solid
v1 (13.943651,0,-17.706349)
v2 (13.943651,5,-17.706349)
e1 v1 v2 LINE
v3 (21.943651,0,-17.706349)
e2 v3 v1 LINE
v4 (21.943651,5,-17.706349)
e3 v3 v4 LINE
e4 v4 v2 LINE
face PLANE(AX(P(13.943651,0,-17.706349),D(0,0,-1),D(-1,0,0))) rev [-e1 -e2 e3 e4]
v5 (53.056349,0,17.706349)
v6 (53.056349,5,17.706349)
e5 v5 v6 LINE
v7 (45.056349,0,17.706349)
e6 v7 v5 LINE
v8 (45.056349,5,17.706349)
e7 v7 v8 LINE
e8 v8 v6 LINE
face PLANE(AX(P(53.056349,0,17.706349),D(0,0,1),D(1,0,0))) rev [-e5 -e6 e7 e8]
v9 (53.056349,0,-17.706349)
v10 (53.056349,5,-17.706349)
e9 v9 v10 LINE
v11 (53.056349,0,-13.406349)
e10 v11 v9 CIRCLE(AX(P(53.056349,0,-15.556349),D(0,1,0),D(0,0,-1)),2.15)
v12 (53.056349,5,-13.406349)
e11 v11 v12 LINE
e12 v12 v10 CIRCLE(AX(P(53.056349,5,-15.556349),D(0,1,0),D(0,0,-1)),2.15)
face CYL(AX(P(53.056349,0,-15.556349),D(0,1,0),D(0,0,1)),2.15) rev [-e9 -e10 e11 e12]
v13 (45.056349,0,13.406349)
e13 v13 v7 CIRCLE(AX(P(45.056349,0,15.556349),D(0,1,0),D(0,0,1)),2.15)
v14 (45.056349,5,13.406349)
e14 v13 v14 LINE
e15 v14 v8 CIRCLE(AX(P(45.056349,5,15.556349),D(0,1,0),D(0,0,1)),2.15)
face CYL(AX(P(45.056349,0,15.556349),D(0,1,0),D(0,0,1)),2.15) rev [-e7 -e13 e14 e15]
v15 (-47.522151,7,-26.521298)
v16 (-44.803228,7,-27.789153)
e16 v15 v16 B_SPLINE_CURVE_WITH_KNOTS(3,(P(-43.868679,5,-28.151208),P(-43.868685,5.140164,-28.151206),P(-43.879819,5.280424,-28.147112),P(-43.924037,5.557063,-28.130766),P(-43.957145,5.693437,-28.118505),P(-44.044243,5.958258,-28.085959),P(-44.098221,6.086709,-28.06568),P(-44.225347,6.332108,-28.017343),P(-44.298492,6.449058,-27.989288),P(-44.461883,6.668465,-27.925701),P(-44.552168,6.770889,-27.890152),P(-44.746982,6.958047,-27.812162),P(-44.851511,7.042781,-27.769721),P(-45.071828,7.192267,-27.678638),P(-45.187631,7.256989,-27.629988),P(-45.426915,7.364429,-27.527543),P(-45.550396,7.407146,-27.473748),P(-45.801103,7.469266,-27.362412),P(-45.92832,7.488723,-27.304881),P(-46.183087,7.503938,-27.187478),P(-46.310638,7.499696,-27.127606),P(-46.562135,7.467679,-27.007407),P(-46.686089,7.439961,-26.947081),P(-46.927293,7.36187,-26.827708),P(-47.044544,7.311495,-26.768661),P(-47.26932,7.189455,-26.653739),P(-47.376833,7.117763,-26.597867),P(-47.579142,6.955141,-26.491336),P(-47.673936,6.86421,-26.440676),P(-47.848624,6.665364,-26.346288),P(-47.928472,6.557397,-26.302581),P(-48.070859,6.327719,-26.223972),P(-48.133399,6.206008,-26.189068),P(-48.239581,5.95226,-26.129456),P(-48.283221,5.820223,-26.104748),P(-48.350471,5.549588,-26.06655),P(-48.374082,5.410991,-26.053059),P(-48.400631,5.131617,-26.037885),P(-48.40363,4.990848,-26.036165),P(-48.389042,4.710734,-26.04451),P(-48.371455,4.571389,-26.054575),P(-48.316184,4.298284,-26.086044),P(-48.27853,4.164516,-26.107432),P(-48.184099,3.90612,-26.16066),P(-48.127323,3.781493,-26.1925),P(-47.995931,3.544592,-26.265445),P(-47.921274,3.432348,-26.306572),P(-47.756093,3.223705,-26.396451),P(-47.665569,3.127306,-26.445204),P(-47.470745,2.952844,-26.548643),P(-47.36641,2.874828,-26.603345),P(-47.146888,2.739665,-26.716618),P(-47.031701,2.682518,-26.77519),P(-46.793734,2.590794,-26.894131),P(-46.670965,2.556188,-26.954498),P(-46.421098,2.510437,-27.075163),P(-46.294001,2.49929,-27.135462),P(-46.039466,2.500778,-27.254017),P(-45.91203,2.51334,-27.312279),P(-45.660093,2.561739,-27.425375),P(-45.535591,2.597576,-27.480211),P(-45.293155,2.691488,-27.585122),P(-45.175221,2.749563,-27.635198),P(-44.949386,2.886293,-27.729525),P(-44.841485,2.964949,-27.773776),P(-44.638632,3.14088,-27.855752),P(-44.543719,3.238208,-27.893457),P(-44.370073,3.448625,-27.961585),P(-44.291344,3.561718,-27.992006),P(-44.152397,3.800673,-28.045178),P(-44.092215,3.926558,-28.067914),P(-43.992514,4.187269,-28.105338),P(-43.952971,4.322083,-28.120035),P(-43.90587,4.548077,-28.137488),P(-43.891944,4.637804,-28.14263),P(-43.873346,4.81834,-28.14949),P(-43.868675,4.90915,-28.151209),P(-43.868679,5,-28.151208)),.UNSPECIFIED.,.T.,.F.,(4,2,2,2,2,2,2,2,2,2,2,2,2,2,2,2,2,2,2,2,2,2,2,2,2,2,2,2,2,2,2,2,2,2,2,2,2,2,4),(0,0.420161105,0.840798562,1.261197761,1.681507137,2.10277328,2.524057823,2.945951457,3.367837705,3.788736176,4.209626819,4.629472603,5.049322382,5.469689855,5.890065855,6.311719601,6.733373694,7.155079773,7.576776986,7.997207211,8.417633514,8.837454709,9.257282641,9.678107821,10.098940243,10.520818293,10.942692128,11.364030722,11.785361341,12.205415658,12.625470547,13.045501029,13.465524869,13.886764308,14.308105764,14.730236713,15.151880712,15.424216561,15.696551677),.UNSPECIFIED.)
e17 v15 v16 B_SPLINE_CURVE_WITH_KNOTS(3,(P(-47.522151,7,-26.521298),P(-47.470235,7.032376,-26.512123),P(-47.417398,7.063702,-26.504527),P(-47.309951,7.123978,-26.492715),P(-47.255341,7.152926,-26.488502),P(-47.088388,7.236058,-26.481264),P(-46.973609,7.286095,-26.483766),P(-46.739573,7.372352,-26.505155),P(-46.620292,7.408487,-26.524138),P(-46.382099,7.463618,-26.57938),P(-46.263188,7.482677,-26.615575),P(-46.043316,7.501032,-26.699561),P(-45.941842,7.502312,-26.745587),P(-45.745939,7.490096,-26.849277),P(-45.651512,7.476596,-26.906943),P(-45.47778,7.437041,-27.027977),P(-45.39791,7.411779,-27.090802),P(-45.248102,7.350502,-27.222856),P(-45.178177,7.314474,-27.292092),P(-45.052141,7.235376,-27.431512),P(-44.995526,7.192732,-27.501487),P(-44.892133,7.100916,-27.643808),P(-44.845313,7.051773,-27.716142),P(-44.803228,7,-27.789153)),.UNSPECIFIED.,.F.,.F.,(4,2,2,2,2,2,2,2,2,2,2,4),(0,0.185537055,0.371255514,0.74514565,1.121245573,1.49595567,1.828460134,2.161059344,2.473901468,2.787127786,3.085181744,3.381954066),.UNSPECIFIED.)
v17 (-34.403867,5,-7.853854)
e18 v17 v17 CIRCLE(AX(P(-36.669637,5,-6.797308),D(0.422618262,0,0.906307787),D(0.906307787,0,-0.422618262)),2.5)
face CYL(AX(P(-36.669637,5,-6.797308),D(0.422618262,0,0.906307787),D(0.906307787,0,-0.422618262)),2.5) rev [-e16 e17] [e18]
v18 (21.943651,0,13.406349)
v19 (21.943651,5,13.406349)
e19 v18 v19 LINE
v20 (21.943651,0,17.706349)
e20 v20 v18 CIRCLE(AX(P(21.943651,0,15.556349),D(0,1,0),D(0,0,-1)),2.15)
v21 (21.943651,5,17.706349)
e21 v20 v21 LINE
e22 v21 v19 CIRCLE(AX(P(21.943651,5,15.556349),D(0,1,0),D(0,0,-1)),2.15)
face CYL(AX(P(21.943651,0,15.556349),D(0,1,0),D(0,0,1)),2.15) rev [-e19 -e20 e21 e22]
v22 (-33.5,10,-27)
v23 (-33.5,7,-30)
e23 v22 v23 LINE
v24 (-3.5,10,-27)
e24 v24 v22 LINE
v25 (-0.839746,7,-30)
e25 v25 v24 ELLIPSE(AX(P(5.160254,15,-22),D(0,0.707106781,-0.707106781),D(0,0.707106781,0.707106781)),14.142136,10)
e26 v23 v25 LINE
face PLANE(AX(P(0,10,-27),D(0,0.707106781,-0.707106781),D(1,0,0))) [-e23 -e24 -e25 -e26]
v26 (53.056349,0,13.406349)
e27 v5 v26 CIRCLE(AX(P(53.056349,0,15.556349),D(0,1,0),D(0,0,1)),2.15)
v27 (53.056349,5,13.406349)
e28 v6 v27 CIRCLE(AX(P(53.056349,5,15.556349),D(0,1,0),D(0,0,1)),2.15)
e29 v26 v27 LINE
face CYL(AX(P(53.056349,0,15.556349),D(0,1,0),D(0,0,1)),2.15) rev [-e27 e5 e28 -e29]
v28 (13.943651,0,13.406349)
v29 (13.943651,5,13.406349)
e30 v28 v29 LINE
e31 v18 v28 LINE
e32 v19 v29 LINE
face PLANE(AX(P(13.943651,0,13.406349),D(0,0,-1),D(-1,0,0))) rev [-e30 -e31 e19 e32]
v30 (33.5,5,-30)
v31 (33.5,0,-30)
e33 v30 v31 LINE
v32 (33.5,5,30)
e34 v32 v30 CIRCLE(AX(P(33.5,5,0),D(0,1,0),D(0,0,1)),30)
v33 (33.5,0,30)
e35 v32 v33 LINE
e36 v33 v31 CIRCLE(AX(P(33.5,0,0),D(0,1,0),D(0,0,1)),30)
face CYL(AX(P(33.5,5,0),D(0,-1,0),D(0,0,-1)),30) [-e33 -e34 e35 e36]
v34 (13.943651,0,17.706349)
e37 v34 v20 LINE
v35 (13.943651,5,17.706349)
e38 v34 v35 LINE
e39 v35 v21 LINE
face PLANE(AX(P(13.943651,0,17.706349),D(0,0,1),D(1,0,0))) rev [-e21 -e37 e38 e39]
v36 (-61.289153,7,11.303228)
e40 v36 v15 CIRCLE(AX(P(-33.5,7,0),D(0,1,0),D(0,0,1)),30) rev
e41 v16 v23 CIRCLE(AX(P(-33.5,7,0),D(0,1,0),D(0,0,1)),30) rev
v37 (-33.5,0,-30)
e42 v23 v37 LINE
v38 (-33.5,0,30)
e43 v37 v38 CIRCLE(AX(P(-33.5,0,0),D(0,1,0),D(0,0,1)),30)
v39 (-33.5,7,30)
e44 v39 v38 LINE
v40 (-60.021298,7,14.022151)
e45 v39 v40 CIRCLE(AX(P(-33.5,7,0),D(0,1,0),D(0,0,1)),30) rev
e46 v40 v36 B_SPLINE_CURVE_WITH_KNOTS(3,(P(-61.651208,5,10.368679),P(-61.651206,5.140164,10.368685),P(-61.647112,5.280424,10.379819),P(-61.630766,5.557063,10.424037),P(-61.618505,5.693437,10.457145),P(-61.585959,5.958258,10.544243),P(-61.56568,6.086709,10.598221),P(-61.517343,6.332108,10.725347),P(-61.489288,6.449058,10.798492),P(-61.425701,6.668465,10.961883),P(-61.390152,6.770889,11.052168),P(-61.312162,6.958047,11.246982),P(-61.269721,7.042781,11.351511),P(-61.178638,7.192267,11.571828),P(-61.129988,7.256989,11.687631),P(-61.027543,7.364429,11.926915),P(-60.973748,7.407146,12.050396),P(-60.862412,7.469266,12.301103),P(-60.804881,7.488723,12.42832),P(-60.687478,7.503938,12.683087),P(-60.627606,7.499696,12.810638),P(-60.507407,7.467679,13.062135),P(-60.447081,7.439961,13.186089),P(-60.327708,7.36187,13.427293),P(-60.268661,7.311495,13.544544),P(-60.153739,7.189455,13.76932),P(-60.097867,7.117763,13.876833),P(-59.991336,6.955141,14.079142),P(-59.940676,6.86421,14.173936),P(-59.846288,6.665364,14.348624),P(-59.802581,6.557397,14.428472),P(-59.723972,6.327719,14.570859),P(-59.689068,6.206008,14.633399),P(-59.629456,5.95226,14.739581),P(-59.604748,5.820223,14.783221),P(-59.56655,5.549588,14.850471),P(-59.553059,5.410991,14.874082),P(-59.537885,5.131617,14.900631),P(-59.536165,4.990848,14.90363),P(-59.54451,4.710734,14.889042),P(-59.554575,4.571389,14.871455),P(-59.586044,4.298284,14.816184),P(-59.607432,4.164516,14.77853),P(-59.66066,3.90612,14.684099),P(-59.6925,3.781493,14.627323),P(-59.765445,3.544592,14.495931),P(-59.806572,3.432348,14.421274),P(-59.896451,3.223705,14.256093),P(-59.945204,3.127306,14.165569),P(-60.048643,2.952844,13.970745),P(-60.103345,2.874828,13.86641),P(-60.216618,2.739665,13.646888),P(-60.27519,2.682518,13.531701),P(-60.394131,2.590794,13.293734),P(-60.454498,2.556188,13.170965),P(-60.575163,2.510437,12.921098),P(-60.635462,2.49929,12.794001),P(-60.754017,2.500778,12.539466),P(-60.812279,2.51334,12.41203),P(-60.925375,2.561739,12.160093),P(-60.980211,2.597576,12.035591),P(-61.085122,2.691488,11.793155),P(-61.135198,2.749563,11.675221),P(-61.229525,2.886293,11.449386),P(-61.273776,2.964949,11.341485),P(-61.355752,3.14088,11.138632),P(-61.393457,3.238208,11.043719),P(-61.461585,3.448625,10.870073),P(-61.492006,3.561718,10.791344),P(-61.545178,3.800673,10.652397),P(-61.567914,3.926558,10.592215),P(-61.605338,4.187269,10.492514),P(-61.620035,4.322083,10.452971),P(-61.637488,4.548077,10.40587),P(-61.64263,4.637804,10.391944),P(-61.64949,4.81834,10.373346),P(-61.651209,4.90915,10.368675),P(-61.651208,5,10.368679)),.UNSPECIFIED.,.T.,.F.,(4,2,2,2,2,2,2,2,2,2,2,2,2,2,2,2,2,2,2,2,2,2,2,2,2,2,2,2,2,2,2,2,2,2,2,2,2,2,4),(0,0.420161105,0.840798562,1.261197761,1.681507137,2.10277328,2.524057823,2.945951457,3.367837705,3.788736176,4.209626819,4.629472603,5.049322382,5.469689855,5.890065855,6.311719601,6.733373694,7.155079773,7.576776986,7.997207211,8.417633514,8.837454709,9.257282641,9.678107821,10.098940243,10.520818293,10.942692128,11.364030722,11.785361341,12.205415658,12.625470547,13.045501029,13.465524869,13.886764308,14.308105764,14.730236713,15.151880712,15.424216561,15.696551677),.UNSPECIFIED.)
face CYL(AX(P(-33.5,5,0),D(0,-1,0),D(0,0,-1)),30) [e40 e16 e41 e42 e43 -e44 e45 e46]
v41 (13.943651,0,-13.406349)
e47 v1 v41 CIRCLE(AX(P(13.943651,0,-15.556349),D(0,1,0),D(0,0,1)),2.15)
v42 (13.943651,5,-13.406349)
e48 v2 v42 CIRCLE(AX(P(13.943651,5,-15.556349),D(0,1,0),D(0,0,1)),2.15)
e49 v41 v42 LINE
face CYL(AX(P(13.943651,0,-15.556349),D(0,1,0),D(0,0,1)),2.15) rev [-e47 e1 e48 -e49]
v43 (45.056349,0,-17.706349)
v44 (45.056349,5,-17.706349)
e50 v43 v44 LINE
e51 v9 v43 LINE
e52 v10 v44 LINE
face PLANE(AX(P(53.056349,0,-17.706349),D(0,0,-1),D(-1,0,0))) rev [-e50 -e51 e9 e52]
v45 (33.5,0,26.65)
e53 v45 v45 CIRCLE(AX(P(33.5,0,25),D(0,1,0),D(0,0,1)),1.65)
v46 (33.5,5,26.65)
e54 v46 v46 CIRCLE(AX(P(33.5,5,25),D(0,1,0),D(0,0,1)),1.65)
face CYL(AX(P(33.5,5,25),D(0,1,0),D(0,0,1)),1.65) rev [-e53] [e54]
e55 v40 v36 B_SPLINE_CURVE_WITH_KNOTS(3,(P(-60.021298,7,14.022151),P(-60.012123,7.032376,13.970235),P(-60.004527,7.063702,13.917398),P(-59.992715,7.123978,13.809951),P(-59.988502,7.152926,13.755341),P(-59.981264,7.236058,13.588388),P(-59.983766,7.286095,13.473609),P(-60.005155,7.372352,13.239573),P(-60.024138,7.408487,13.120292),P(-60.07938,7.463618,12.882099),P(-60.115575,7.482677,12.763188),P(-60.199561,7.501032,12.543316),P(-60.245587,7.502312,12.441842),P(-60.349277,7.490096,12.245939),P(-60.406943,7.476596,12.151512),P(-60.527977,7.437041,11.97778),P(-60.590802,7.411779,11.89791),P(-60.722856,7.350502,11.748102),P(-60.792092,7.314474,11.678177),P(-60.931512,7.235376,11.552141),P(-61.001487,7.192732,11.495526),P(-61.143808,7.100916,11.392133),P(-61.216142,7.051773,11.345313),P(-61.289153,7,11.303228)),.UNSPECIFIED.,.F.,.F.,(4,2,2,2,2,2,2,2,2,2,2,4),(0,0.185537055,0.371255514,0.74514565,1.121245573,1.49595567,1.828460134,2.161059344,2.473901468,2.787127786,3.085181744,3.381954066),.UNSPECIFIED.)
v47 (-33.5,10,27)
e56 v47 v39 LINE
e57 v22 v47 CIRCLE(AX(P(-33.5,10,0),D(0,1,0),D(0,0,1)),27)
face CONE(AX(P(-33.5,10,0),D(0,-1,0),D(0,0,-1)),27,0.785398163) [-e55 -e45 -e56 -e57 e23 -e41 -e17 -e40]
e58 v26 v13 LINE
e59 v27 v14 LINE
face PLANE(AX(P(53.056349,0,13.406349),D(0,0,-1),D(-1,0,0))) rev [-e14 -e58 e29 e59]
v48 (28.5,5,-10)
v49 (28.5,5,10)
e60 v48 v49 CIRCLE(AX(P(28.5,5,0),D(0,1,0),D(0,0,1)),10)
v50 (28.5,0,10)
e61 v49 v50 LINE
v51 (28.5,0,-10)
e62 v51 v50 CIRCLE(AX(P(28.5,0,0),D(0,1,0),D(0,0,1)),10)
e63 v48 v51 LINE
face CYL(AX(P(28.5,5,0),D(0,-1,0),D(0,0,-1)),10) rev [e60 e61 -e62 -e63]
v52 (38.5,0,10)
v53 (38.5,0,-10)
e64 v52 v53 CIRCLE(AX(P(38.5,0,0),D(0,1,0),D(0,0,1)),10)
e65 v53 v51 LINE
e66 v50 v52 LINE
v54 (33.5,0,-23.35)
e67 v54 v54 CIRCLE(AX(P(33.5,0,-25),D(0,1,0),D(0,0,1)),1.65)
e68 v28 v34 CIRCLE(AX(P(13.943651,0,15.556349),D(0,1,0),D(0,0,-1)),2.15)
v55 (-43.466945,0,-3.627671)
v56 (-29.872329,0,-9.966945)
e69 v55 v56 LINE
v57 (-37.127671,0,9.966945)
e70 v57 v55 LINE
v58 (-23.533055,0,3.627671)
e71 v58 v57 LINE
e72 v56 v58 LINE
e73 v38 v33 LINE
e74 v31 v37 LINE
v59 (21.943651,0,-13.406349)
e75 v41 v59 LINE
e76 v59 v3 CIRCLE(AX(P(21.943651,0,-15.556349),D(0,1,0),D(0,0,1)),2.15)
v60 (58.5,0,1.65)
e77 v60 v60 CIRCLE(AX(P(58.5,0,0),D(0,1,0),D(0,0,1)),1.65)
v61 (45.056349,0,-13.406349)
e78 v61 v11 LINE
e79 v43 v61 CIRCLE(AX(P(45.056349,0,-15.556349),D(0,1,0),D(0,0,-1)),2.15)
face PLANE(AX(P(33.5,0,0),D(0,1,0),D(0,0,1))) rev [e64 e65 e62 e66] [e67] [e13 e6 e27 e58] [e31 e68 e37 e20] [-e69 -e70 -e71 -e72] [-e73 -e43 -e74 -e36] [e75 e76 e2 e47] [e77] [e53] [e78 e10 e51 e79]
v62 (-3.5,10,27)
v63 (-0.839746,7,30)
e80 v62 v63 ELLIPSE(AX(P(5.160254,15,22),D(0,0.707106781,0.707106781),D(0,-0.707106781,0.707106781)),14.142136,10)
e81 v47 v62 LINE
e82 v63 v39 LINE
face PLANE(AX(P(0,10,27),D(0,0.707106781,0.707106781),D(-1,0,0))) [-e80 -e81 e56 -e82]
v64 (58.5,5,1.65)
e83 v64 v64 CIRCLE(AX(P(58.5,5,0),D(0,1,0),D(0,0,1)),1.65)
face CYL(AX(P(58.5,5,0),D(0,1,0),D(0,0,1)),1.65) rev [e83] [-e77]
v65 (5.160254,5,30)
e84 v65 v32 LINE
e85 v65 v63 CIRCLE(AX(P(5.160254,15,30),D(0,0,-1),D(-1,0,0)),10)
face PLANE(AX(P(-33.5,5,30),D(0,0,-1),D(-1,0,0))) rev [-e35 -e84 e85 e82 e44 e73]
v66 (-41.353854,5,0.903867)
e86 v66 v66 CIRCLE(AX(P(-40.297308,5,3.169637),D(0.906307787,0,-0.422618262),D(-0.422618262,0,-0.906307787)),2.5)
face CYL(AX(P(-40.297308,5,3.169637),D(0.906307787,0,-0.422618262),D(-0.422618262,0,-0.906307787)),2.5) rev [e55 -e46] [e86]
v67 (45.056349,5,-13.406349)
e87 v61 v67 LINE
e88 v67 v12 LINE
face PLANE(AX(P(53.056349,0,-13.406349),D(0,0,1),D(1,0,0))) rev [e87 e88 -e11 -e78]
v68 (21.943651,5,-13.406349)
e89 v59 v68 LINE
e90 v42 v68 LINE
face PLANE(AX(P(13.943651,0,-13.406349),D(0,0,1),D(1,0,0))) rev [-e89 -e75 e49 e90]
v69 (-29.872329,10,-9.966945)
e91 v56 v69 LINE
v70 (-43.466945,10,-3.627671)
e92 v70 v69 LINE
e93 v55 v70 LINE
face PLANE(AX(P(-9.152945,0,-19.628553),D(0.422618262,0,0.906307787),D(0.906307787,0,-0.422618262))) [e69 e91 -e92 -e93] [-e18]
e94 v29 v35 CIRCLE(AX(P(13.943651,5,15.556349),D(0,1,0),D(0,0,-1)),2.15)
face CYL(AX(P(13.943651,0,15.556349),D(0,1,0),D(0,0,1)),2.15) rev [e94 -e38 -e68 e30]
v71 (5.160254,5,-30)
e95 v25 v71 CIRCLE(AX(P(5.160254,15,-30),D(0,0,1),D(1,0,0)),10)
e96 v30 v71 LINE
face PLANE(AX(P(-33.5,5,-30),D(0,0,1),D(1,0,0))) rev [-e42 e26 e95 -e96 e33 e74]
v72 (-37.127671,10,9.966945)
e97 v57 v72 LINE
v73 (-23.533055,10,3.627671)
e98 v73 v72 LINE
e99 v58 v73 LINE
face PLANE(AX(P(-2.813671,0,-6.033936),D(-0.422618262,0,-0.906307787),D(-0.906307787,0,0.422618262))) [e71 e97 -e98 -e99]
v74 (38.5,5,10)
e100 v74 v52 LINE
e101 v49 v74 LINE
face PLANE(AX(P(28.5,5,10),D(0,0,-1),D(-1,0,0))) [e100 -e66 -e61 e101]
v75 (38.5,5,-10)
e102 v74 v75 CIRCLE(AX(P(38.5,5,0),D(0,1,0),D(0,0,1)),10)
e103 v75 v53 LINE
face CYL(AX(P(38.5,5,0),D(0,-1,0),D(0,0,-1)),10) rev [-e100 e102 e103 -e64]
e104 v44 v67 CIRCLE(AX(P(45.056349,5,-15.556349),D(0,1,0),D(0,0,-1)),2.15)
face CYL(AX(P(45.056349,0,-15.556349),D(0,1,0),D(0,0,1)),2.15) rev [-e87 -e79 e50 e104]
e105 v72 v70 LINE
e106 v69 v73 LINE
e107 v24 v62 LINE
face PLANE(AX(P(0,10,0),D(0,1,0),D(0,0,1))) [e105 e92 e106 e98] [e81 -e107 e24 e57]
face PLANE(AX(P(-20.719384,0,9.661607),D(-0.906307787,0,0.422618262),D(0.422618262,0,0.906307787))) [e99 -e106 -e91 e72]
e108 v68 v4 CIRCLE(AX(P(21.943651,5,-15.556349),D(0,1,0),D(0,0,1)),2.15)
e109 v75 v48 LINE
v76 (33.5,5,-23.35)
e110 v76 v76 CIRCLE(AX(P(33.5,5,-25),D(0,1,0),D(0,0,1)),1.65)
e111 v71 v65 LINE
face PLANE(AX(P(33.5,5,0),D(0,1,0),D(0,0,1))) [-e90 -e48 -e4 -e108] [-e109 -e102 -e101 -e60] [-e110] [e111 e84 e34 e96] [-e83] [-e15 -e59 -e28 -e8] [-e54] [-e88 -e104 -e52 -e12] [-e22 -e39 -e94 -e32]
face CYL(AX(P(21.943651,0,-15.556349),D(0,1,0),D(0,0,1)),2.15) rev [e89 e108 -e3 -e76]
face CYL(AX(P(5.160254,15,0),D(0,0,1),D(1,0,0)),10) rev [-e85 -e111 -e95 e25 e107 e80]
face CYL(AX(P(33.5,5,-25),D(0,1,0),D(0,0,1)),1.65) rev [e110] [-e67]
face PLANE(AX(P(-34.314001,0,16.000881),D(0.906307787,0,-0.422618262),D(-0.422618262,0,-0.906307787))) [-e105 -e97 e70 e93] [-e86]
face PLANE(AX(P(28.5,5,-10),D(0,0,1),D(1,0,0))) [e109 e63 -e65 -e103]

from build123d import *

# Parameters (mm, degrees)
BOSS_EXTRUDE1_DEPTH = 5
CUT_EXTRUDE1_DEPTH  = 71.407741052
BOSS_EXTRUDE2_DEPTH = 5
FILLET1_R           = 10
CUT_EXTRUDE2_DEPTH  = 71.938353519
M4_TAPPED_HOLE1_D   = 3.3
SKETCH13_W          = 2.5
SKETCH13_H          = 32.367781463
SKETCH17_W          = 2.5
SKETCH17_H          = 32.367781463
CHAMFER1_SIZE       = 3


with BuildPart() as part:
    # Sketch1 → Boss-Extrude1 (new body)
    with BuildSketch(Plane(origin=(0, 0, 0), x_dir=(1, 0, 0), z_dir=(0, 1, 0))):
        with BuildLine():
            Line((-33.5, 30), (33.5, 30))
            ThreePointArc((33.5, 30), (63.5, 0), (33.5, -30))
            Line((33.5, -30), (-33.5, -30))
            ThreePointArc((-33.5, -30), (-63.5, 0), (-33.5, 30))
        make_face()
        with BuildLine():
            Line((28.5, 10), (38.5, 10))
            ThreePointArc((38.5, 10), (48.5, 0), (38.5, -10))
            Line((38.5, -10), (28.5, -10))
            ThreePointArc((28.5, -10), (18.5, 0), (28.5, 10))
        make_face(mode=Mode.SUBTRACT)
    extrude(amount=BOSS_EXTRUDE1_DEPTH)

    # Sketch2 → Cut-Extrude1 (cut, through all)
    with BuildSketch(Plane(origin=(0, 5, 0), x_dir=(1, 0, 0), z_dir=(0, 1, 0))):
        with BuildLine():
            Line((13.943650814, 17.706349186), (21.943650814, 17.706349186))
            ThreePointArc((21.943650814, 17.706349186), (24.093650814, 15.556349186), (21.943650814, 13.406349186))
            Line((21.943650814, 13.406349186), (13.943650814, 13.406349186))
            ThreePointArc((13.943650814, 13.406349186), (11.793650814, 15.556349186), (13.943650814, 17.706349186))
        make_face()
        with BuildLine():
            Line((53.056349186, 17.706349186), (45.056349186, 17.706349186))
            ThreePointArc((45.056349186, 17.706349186), (42.906349186, 15.556349186), (45.056349186, 13.406349186))
            Line((45.056349186, 13.406349186), (53.056349186, 13.406349186))
            ThreePointArc((53.056349186, 13.406349186), (55.206349186, 15.556349186), (53.056349186, 17.706349186))
        make_face()
        with BuildLine():
            Line((53.056349186, -17.706349186), (45.056349186, -17.706349186))
            ThreePointArc((45.056349186, -17.706349186), (42.906349186, -15.556349186), (45.056349186, -13.406349186))
            Line((45.056349186, -13.406349186), (53.056349186, -13.406349186))
            ThreePointArc((53.056349186, -13.406349186), (55.206349186, -15.556349186), (53.056349186, -17.706349186))
        make_face()
        with BuildLine():
            Line((13.943650814, -17.706349186), (21.943650814, -17.706349186))
            ThreePointArc((21.943650814, -17.706349186), (24.093650814, -15.556349186), (21.943650814, -13.406349186))
            Line((21.943650814, -13.406349186), (13.943650814, -13.406349186))
            ThreePointArc((13.943650814, -13.406349186), (11.793650814, -15.556349186), (13.943650814, -17.706349186))
        make_face()
    extrude(amount=-CUT_EXTRUDE1_DEPTH, mode=Mode.SUBTRACT)

    # Sketch8 → Boss-Extrude2 (add)
    with BuildSketch(Plane(origin=(0, 5, 0), x_dir=(1, 0, 0), z_dir=(0, 1, 0))):
        with BuildLine():
            ThreePointArc((-33.5, -30), (-12.286796564, -21.213203436), (-3.5, 0))
            ThreePointArc((-3.5, 0), (-12.286796564, 21.213203436), (-33.5, 30))
            ThreePointArc((-33.5, 30), (-63.5, 0), (-33.5, -30))
        make_face()
        with BuildLine():
            Line((-3.5, 0), (-3.5, 30))
            Line((-3.5, 30), (-33.5, 30))
            ThreePointArc((-33.5, 30), (-12.286796564, 21.213203436), (-3.5, 0))
        make_face()
        with BuildLine():
            Line((-3.5, -30), (-3.5, 0))
            ThreePointArc((-3.5, 0), (-12.286796564, -21.213203436), (-33.5, -30))
            Line((-33.5, -30), (-3.5, -30))
        make_face()
    extrude(amount=BOSS_EXTRUDE2_DEPTH)

    # Fillet1
    # the kernel refuses this fillet: 10 mm, written as the material it adds along each edge
    with BuildSketch(Plane(origin=(-3.5, 5, -30), x_dir=(0, 1, 0), z_dir=(0, 0, 1))) as fillet1_piece_1:
        with BuildLine():
            CenterArc((10, -8.660254038), FILLET1_R, 120, 60)
            Line((0, -8.660254038), (-0.2, -8.660254038))
            Line((-0.2, -8.660254038), (-0.2, 0))
            Line((-0.2, 0), (0, 0.2))
            ThreePointArc((0, 0.2), (2.5, 0.2), (4.9, 0.173205081))
            Line((4.9, 0.173205081), (5, 0))
        make_face()
    extrude(amount=60)

    # Sketch9 → Cut-Extrude2 (cut, through all)
    with BuildSketch(Plane(origin=(0, 10, 0), x_dir=(1, 0, 0), z_dir=(0, 1, 0))):
        Polygon((-29.87232856, 9.966945366), (-23.533054634, -3.62767144), (-37.12767144, -9.966945366), (-43.466945366, 3.62767144), align=None)
    extrude(amount=-CUT_EXTRUDE2_DEPTH, mode=Mode.SUBTRACT)

    # M4 Tapped Hole1 (through all)
    with Locations(Plane(origin=(0, 5, 0), x_dir=(1, 0, 0), z_dir=(0, 1, 0))):
        with Locations((58.5, 0), (33.5, 25), (33.5, -25)):
            Hole(M4_TAPPED_HOLE1_D / 2)

    # Sketch13 → M6 Tapped Hole1 (revolve, cut)
    with BuildSketch(Plane(origin=(-40.297308403, 5, 3.169636963), x_dir=(-0.4226182617406973, 0, -0.9063077870366509), z_dir=(0, 1, 0))):
        with Locations((1.25, 16.183890732)):
            Rectangle(SKETCH13_W, SKETCH13_H)
    revolve(axis=Axis((-34.542253955, 5, 0.486011001), (-0.9063077870366509, 0, 0.42261826174069733)), mode=Mode.SUBTRACT)

    # Sketch17 → M6 Tapped Hole3 (revolve, cut)
    with BuildSketch(Plane(origin=(-36.669636963, 5, -6.797308403), x_dir=(0.9063077870366509, 0, -0.42261826174069766), z_dir=(0, 1, 0))):
        with Locations((1.25, 16.183890732)):
            Rectangle(SKETCH17_W, SKETCH17_H)
    revolve(axis=Axis((-33.986011001, 5, -1.042253955), (-0.42261826174069766, 0, -0.9063077870366508)), mode=Mode.SUBTRACT)

    # Chamfer1
    # the kernel refuses this chamfer: 3 mm, written as the material it takes off along each edge
    with BuildSketch(Plane(origin=(-33.5, 10, 30), x_dir=(0, 0.02749587661058619, -0.9996219169112968), z_dir=(1, 0, 0)), Plane(origin=(4.215048964, 10, -30), x_dir=(0, 0.02749587661058619, 0.9996219169112968), z_dir=(-1, 0, 0))) as chamfer1_piece_1:
        Polygon((CHAMFER1_SIZE * 0.999621916911, -CHAMFER1_SIZE * 0.0274958766106), (-CHAMFER1_SIZE * 0.0274958766106, -CHAMFER1_SIZE * 0.999621916911), (0, 0), align=None)
    extrude(amount=37.715048964, mode=Mode.SUBTRACT)
    with BuildSketch(Plane(origin=(-33.5, 10, 0), x_dir=(0, 0, 1), z_dir=(1, 0, 0))) as chamfer1_piece_2:
        Polygon((30 - CHAMFER1_SIZE, 0), (30, CHAMFER1_SIZE), (30, 0), align=None)
    revolve(axis=Axis((-33.5, 10, 0), (0, -1, 0)), revolution_arc=180, mode=Mode.SUBTRACT)


solid = part.part
